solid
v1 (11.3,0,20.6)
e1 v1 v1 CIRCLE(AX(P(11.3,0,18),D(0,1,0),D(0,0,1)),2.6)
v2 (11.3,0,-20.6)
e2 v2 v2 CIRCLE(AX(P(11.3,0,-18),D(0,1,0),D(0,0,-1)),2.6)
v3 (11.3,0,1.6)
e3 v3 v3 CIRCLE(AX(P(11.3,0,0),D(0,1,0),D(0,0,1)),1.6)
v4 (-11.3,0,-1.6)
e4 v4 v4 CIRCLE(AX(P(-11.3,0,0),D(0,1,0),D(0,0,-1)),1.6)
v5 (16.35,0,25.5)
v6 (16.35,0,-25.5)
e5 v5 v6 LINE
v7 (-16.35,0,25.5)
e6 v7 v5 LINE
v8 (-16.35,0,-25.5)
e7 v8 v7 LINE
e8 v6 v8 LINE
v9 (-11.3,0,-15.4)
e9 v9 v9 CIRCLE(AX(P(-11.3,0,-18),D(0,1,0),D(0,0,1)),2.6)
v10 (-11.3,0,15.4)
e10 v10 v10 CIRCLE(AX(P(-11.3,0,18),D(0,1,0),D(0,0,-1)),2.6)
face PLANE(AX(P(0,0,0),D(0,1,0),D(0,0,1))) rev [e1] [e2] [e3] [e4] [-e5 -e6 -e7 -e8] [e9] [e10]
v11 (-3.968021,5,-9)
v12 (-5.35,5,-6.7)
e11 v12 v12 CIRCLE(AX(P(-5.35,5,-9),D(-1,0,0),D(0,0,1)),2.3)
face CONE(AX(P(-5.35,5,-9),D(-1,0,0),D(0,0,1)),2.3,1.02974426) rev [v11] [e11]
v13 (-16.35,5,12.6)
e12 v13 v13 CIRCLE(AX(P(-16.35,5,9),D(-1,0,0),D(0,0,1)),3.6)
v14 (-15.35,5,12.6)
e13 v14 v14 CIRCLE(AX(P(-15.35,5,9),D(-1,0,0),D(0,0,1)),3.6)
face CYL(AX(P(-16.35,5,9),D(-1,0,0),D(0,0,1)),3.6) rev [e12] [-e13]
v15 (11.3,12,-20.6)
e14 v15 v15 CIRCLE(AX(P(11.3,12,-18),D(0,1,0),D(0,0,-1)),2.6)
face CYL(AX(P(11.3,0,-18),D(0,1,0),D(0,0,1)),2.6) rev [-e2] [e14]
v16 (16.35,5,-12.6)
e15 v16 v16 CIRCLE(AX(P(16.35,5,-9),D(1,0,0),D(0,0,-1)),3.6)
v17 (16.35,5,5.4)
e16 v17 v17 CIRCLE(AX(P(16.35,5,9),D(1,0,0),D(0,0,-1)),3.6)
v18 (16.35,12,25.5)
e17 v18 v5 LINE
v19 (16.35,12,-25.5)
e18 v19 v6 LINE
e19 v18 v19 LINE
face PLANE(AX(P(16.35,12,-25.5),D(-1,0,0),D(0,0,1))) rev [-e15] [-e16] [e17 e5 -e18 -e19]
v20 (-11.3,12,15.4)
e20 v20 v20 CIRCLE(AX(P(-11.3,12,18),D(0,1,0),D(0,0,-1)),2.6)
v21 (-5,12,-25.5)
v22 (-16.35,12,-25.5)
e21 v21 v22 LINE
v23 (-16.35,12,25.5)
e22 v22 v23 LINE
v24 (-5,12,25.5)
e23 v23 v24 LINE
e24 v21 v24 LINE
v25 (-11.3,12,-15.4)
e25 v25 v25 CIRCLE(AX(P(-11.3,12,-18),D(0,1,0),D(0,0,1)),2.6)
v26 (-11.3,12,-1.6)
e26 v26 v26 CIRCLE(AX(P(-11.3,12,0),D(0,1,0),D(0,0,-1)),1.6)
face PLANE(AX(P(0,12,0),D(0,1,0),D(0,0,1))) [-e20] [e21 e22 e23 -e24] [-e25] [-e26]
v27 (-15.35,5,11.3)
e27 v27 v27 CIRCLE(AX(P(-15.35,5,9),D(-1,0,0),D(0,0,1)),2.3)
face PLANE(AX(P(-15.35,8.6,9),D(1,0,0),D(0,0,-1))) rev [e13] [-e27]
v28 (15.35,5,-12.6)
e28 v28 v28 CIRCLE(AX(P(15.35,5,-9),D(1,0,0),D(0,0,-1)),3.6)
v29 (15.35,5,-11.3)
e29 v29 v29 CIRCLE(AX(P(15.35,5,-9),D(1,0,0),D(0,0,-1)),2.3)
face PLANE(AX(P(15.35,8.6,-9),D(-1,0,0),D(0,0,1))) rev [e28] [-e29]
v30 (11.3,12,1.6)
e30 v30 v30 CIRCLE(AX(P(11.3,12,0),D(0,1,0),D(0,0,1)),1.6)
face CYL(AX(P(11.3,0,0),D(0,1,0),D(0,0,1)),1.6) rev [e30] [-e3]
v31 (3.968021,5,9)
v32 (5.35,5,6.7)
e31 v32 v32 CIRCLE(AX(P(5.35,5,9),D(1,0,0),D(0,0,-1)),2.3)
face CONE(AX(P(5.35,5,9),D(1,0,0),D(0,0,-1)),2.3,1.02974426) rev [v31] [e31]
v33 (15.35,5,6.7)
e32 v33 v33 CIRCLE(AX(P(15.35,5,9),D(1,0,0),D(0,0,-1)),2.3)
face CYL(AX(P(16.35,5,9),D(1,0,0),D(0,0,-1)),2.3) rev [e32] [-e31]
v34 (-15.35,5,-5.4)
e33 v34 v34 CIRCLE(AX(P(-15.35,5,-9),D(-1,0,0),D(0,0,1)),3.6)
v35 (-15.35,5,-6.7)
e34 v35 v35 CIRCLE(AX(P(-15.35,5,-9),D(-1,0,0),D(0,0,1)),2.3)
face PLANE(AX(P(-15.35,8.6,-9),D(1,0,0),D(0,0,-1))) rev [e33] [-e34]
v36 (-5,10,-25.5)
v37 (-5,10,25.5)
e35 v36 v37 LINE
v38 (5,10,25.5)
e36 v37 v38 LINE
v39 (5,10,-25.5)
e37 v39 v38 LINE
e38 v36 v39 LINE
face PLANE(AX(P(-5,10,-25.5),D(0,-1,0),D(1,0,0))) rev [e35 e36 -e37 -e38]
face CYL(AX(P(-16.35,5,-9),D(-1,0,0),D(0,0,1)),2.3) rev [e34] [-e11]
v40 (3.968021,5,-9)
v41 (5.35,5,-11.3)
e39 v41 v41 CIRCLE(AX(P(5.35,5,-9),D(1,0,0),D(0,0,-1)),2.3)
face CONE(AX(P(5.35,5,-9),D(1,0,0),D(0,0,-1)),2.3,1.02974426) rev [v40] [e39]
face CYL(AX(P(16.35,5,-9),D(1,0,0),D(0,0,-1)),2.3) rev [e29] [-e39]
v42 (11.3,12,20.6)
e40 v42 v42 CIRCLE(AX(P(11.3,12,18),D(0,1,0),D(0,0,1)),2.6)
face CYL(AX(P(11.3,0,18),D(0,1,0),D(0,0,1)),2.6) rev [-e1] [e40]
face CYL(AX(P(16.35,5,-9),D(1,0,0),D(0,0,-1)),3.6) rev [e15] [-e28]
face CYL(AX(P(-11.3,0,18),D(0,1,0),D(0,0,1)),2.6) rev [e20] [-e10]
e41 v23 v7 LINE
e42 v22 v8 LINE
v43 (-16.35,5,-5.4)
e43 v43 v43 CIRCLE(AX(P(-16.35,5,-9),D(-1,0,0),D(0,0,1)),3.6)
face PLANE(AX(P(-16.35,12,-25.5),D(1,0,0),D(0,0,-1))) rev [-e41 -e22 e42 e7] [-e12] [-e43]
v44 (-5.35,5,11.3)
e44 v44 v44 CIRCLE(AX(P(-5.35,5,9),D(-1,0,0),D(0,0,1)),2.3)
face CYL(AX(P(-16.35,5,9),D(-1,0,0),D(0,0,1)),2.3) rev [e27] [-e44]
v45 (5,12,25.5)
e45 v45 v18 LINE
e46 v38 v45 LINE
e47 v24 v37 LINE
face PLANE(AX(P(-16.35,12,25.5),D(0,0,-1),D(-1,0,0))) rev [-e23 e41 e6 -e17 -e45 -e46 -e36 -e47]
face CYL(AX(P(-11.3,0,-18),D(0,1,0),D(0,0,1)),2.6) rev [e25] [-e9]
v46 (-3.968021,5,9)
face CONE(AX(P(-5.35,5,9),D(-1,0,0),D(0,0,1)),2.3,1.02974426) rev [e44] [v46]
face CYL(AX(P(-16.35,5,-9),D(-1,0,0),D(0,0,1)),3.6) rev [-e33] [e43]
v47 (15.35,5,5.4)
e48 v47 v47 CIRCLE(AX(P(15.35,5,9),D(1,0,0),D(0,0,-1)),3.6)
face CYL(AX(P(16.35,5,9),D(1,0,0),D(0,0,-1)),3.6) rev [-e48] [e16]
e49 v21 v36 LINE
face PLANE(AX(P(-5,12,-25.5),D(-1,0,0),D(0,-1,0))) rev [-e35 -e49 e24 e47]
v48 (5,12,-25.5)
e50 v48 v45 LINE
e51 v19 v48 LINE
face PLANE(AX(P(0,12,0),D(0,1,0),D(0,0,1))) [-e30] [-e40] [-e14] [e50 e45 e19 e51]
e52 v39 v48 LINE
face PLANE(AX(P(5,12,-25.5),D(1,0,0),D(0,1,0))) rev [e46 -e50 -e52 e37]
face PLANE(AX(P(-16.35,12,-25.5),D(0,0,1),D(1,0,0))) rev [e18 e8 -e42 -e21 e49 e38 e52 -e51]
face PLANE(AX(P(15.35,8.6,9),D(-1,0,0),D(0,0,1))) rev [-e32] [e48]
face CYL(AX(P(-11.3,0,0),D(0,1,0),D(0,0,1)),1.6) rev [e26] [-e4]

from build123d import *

# Parameters (mm, degrees)
SKETCH_1_W          = 32.7
SKETCH_1_H          = 51
EXTRUDE_1_DEPTH     = 12
SKETCH_2_R          = 2.6
SKETCH_2_R_2        = 1.6
CUT_EXTRUDE_1_DEPTH = 33.581781719
SKETCH_3_W          = 10
SKETCH_3_H          = 2
CUT_EXTRUDE_2_DEPTH = 55.884628996


# Read off the part's stored shape, not the designer's step: 高级异型孔1
with BuildPart() as part:
    # 草图1 → 凸台-拉伸1 (new body)
    with BuildSketch(Plane(origin=(0, 0, 0), x_dir=(1, 0, 0), z_dir=(0, 1, 0))):
        Rectangle(SKETCH_1_W, SKETCH_1_H)
    extrude(amount=EXTRUDE_1_DEPTH)

    # 草图2 → 切除-拉伸1 (cut, through all)
    with BuildSketch(Plane(origin=(0, 12, 0), x_dir=(1, 0, 0), z_dir=(0, 1, 0))):
        with Locations(Location((-11.3, 18, 0), (0, 0, 270))):
            Circle(SKETCH_2_R)
        with Locations(Location((11.3, 18, 0), (0, 0, 90))):
            Circle(SKETCH_2_R)
        with Locations(Location((11.3, -18, 0), (0, 0, 270))):
            Circle(SKETCH_2_R)
        with Locations(Location((-11.3, -18, 0), (0, 0, 90))):
            Circle(SKETCH_2_R)
        with Locations(Location((11.3, 0, 0), (0, 0, 270))):
            Circle(SKETCH_2_R_2)
        with Locations(Location((-11.3, 0, 0), (0, 0, 90))):
            Circle(SKETCH_2_R_2)
    extrude(amount=-CUT_EXTRUDE_1_DEPTH, mode=Mode.SUBTRACT)

    # 草图3 → 切除-拉伸2 (cut, through all)
    with BuildSketch(Plane.XY.offset(25.5)):
        with Locations((0, 11)):
            Rectangle(SKETCH_3_W, SKETCH_3_H)
    extrude(amount=-CUT_EXTRUDE_2_DEPTH, mode=Mode.SUBTRACT)

    # 高级异型孔1 outline → 高级异型孔1 (revolve, cut)
    with BuildSketch(Plane(origin=(0, 5, 9), x_dir=(0, 1, 0), z_dir=(0, 0, -1))):
        Polygon((3.6, -16.35), (3.6, -15.35), (2.3, -15.35), (2.3, -5.35), (0, -3.96802058), (0, -16.35), align=None)
    other_1 = revolve(axis=Axis((0, 5, 9), (1, 0, 0)), mode=Mode.SUBTRACT)

    # Other 1 2 outline → Other 1 2 (revolve, cut)
    with BuildSketch(Plane(origin=(0, 5, -9), x_dir=(0, 1, 0), z_dir=(0, 0, -1))):
        Polygon((0, -16.35), (3.6, -16.35), (3.6, -15.35), (2.3, -15.35), (2.3, -5.35), (0, -3.96802058), align=None)
    other_1_2 = revolve(axis=Axis((0, 5, -9), (1, 0, 0)), mode=Mode.SUBTRACT)

    # 镜向1: 高级异型孔1, Other 1 2 across plane
    add(other_1.mirror(Plane(origin=(0, 0, 0), x_dir=(0, 0, 1), z_dir=(1, 0, 0))), mode=Mode.SUBTRACT)
    add(other_1_2.mirror(Plane(origin=(0, 0, 0), x_dir=(0, 0, 1), z_dir=(1, 0, 0))), mode=Mode.SUBTRACT)


solid = part.part
